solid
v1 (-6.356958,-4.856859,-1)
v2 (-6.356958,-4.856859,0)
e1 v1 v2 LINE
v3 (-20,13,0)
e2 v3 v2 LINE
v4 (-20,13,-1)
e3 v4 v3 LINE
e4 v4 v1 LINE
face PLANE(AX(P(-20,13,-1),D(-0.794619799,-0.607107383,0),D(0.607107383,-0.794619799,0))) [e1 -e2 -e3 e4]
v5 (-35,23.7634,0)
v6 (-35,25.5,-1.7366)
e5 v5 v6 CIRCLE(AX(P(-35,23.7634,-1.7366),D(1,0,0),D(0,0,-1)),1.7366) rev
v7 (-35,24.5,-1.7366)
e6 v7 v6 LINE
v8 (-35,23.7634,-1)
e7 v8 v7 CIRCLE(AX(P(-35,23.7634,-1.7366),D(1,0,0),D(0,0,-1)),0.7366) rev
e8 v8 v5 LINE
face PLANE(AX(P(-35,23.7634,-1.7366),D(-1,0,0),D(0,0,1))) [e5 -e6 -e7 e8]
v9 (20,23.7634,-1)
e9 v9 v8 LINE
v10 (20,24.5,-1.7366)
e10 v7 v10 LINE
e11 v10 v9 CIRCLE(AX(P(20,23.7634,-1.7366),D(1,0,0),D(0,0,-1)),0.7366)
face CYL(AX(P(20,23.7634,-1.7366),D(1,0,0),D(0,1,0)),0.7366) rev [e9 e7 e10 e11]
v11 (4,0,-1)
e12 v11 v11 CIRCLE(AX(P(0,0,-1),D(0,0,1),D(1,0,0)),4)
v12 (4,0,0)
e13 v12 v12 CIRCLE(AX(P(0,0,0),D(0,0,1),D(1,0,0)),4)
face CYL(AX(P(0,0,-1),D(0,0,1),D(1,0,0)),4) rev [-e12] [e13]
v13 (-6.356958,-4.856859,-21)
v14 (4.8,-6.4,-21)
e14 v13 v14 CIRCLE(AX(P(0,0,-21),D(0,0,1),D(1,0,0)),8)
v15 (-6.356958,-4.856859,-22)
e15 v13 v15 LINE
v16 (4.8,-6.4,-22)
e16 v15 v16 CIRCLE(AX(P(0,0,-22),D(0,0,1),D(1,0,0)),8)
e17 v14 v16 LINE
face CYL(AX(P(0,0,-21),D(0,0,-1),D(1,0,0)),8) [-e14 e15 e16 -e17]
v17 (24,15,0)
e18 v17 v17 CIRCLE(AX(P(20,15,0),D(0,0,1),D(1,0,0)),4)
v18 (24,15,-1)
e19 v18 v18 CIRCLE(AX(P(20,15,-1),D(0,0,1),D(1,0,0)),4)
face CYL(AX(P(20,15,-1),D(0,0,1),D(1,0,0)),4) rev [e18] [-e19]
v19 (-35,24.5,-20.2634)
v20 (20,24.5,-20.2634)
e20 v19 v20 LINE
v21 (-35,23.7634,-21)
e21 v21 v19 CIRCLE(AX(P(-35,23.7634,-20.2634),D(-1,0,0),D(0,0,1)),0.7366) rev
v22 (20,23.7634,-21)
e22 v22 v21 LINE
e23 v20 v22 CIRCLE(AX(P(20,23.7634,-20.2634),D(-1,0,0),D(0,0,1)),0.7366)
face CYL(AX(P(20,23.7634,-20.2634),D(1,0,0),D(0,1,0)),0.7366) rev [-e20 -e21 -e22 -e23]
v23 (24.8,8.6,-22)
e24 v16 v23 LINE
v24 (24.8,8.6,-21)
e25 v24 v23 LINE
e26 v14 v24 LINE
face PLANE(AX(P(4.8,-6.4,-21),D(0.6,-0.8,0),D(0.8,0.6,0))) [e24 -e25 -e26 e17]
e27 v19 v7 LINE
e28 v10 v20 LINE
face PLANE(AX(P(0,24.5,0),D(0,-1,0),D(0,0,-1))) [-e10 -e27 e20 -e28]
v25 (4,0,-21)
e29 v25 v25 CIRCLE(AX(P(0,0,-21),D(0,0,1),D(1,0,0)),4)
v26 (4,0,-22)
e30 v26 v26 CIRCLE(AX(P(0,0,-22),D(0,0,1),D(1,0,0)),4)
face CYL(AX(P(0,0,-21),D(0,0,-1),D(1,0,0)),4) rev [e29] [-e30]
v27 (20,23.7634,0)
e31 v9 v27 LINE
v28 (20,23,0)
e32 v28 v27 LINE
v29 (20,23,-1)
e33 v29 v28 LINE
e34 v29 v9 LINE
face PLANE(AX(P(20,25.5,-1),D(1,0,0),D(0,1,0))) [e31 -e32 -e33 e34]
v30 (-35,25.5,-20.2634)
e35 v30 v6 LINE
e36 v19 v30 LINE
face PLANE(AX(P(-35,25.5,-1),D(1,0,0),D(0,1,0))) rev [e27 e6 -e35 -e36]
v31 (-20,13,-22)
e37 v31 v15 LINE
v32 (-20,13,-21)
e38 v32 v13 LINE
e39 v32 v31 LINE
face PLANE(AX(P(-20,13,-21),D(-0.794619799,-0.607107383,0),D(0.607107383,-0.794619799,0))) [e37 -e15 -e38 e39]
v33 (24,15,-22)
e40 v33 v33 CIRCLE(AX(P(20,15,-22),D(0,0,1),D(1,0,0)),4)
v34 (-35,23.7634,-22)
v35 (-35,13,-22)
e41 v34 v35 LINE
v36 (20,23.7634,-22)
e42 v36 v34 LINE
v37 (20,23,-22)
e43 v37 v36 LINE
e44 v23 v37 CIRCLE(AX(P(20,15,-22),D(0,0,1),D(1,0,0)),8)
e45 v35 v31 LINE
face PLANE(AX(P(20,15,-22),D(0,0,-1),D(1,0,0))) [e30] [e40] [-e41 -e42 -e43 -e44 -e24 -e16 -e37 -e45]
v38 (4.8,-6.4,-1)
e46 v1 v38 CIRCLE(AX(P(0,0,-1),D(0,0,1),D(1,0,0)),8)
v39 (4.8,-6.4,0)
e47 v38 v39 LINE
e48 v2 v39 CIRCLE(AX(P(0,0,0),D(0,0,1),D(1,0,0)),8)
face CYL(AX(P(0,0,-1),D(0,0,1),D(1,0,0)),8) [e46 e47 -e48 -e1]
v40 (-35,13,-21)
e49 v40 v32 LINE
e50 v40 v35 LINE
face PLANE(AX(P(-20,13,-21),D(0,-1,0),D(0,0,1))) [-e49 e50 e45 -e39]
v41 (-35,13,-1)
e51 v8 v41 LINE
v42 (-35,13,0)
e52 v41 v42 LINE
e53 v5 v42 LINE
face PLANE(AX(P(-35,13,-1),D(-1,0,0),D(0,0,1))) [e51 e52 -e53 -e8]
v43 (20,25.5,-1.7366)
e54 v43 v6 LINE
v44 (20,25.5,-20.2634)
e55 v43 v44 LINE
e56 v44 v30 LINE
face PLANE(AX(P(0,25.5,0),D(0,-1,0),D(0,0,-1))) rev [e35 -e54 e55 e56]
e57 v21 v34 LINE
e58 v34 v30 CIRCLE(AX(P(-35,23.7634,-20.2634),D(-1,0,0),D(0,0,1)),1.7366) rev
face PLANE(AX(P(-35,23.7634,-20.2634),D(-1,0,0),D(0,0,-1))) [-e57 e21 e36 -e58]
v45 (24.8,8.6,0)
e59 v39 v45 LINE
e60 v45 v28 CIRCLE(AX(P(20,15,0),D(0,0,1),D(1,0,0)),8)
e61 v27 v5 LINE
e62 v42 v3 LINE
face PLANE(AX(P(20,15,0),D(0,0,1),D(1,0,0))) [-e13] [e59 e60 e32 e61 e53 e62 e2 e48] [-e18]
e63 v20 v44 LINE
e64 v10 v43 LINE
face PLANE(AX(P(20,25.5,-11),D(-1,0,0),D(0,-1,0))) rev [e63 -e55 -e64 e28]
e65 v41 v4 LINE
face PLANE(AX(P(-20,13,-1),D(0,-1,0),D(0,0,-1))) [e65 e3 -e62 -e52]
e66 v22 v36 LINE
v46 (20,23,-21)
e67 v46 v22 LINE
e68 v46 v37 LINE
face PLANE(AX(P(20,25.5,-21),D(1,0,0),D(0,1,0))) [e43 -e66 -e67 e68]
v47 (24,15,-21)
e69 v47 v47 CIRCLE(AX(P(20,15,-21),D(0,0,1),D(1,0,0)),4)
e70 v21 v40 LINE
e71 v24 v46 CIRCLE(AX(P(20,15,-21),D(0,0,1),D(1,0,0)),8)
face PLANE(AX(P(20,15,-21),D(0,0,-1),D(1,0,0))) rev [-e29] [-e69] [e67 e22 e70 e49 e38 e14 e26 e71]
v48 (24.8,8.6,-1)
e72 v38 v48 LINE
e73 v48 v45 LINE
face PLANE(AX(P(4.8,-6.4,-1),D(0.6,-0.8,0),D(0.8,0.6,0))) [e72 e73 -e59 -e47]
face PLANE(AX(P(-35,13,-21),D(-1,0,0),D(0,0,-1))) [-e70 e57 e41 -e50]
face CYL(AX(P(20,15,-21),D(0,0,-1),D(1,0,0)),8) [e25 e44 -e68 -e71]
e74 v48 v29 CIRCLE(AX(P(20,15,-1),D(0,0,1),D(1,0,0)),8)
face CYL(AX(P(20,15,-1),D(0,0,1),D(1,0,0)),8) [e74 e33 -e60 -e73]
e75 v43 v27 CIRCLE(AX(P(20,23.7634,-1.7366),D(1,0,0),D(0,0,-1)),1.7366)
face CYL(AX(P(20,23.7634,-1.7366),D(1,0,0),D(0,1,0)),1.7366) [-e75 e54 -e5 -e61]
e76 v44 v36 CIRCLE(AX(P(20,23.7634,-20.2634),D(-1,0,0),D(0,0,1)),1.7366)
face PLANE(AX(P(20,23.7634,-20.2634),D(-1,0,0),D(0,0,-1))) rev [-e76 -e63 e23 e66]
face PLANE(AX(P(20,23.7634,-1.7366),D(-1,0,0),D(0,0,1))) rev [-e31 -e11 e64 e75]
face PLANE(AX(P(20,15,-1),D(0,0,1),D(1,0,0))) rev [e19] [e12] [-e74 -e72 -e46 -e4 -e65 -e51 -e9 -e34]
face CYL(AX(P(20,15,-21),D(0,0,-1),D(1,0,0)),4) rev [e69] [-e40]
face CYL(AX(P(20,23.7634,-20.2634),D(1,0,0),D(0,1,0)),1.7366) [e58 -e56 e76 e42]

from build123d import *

# Parameters (mm, degrees)
SKETCH_1_R                       = 4
SM_BASE_FLANGE_2_DEPTH           = 1
SM_EDGE_FLANGE_2_STRIP_W         = 5.4732
SM_EDGE_FLANGE_2_STRIP_H         = 1
SM_EDGE_FLANGE_2_STRIP_CUT_DEPTH = 55
SM_EDGE_FLANGE_2_DEPTH           = 55


# Sheet-metal steps are written as plain solids
with BuildPart() as part:
    # Sketch 1 → Базовая кромка2 (new body)
    with BuildSketch(Plane.XY):
        with BuildLine():
            Line((-20, 13), (-6.356958393, -4.856859066))
            ThreePointArc((-6.356958393, -4.856859066), (-1.096061515, -7.924559871), (4.8, -6.4))
            Line((4.8, -6.4), (24.8, 8.6))
            ThreePointArc((24.8, 8.6), (27.589466384, 17.529822128), (20, 23))
            Line((20, 23), (20, 25.5))
            Line((20, 25.5), (-20, 25.5))
            Line((-20, 25.5), (-35, 25.5))
            Line((-35, 25.5), (-35, 13))
            Line((-35, 13), (-20, 13))
        make_face()
        Circle(SKETCH_1_R, mode=Mode.SUBTRACT)
        with Locations((20, 15)):
            Circle(SKETCH_1_R, mode=Mode.SUBTRACT)
    extrude(amount=-SM_BASE_FLANGE_2_DEPTH)

    # Ребро-кромка2 strip (across the edge) → Ребро-кромка2 strip cut (cut)
    with BuildSketch(Plane(origin=(-35, 25.5, -1), x_dir=(0, -1, 0), z_dir=(1, 0, 0))):
        with Locations((-1, -0.5)):
            Rectangle(SM_EDGE_FLANGE_2_STRIP_W, SM_EDGE_FLANGE_2_STRIP_H)
    extrude(amount=SM_EDGE_FLANGE_2_STRIP_CUT_DEPTH, mode=Mode.SUBTRACT)

    # Ребро-кромка2 section (across the edge) → Ребро-кромка2 (add)
    with BuildSketch(Plane(origin=(-35, 25.5, -1), x_dir=(0, -1, 0), z_dir=(1, 0, 0))):
        with BuildLine():
            Line((0, 0.7366), (0, 10))
            Line((0, 10), (1, 10))
            Line((1, 10), (1, 0.7366))
            ThreePointArc((1, 0.7366), (1.215745145, 0.215745145), (1.7366, 0))
            Line((1.7366, 0), (1.7366, -1))
            ThreePointArc((1.7366, -1), (0.508638364, -0.491361636), (0, 0.7366))
        make_face()
    extrude(amount=SM_EDGE_FLANGE_2_DEPTH)

    # Зеркальное отражение1: part across face


with BuildPart() as part_1:
    add(part.part)
    add(part.part.mirror(Plane(origin=(-7.5, 25, -11), x_dir=(1, 0, 0), z_dir=(0, 0, -1))))


solid = part_1.part
